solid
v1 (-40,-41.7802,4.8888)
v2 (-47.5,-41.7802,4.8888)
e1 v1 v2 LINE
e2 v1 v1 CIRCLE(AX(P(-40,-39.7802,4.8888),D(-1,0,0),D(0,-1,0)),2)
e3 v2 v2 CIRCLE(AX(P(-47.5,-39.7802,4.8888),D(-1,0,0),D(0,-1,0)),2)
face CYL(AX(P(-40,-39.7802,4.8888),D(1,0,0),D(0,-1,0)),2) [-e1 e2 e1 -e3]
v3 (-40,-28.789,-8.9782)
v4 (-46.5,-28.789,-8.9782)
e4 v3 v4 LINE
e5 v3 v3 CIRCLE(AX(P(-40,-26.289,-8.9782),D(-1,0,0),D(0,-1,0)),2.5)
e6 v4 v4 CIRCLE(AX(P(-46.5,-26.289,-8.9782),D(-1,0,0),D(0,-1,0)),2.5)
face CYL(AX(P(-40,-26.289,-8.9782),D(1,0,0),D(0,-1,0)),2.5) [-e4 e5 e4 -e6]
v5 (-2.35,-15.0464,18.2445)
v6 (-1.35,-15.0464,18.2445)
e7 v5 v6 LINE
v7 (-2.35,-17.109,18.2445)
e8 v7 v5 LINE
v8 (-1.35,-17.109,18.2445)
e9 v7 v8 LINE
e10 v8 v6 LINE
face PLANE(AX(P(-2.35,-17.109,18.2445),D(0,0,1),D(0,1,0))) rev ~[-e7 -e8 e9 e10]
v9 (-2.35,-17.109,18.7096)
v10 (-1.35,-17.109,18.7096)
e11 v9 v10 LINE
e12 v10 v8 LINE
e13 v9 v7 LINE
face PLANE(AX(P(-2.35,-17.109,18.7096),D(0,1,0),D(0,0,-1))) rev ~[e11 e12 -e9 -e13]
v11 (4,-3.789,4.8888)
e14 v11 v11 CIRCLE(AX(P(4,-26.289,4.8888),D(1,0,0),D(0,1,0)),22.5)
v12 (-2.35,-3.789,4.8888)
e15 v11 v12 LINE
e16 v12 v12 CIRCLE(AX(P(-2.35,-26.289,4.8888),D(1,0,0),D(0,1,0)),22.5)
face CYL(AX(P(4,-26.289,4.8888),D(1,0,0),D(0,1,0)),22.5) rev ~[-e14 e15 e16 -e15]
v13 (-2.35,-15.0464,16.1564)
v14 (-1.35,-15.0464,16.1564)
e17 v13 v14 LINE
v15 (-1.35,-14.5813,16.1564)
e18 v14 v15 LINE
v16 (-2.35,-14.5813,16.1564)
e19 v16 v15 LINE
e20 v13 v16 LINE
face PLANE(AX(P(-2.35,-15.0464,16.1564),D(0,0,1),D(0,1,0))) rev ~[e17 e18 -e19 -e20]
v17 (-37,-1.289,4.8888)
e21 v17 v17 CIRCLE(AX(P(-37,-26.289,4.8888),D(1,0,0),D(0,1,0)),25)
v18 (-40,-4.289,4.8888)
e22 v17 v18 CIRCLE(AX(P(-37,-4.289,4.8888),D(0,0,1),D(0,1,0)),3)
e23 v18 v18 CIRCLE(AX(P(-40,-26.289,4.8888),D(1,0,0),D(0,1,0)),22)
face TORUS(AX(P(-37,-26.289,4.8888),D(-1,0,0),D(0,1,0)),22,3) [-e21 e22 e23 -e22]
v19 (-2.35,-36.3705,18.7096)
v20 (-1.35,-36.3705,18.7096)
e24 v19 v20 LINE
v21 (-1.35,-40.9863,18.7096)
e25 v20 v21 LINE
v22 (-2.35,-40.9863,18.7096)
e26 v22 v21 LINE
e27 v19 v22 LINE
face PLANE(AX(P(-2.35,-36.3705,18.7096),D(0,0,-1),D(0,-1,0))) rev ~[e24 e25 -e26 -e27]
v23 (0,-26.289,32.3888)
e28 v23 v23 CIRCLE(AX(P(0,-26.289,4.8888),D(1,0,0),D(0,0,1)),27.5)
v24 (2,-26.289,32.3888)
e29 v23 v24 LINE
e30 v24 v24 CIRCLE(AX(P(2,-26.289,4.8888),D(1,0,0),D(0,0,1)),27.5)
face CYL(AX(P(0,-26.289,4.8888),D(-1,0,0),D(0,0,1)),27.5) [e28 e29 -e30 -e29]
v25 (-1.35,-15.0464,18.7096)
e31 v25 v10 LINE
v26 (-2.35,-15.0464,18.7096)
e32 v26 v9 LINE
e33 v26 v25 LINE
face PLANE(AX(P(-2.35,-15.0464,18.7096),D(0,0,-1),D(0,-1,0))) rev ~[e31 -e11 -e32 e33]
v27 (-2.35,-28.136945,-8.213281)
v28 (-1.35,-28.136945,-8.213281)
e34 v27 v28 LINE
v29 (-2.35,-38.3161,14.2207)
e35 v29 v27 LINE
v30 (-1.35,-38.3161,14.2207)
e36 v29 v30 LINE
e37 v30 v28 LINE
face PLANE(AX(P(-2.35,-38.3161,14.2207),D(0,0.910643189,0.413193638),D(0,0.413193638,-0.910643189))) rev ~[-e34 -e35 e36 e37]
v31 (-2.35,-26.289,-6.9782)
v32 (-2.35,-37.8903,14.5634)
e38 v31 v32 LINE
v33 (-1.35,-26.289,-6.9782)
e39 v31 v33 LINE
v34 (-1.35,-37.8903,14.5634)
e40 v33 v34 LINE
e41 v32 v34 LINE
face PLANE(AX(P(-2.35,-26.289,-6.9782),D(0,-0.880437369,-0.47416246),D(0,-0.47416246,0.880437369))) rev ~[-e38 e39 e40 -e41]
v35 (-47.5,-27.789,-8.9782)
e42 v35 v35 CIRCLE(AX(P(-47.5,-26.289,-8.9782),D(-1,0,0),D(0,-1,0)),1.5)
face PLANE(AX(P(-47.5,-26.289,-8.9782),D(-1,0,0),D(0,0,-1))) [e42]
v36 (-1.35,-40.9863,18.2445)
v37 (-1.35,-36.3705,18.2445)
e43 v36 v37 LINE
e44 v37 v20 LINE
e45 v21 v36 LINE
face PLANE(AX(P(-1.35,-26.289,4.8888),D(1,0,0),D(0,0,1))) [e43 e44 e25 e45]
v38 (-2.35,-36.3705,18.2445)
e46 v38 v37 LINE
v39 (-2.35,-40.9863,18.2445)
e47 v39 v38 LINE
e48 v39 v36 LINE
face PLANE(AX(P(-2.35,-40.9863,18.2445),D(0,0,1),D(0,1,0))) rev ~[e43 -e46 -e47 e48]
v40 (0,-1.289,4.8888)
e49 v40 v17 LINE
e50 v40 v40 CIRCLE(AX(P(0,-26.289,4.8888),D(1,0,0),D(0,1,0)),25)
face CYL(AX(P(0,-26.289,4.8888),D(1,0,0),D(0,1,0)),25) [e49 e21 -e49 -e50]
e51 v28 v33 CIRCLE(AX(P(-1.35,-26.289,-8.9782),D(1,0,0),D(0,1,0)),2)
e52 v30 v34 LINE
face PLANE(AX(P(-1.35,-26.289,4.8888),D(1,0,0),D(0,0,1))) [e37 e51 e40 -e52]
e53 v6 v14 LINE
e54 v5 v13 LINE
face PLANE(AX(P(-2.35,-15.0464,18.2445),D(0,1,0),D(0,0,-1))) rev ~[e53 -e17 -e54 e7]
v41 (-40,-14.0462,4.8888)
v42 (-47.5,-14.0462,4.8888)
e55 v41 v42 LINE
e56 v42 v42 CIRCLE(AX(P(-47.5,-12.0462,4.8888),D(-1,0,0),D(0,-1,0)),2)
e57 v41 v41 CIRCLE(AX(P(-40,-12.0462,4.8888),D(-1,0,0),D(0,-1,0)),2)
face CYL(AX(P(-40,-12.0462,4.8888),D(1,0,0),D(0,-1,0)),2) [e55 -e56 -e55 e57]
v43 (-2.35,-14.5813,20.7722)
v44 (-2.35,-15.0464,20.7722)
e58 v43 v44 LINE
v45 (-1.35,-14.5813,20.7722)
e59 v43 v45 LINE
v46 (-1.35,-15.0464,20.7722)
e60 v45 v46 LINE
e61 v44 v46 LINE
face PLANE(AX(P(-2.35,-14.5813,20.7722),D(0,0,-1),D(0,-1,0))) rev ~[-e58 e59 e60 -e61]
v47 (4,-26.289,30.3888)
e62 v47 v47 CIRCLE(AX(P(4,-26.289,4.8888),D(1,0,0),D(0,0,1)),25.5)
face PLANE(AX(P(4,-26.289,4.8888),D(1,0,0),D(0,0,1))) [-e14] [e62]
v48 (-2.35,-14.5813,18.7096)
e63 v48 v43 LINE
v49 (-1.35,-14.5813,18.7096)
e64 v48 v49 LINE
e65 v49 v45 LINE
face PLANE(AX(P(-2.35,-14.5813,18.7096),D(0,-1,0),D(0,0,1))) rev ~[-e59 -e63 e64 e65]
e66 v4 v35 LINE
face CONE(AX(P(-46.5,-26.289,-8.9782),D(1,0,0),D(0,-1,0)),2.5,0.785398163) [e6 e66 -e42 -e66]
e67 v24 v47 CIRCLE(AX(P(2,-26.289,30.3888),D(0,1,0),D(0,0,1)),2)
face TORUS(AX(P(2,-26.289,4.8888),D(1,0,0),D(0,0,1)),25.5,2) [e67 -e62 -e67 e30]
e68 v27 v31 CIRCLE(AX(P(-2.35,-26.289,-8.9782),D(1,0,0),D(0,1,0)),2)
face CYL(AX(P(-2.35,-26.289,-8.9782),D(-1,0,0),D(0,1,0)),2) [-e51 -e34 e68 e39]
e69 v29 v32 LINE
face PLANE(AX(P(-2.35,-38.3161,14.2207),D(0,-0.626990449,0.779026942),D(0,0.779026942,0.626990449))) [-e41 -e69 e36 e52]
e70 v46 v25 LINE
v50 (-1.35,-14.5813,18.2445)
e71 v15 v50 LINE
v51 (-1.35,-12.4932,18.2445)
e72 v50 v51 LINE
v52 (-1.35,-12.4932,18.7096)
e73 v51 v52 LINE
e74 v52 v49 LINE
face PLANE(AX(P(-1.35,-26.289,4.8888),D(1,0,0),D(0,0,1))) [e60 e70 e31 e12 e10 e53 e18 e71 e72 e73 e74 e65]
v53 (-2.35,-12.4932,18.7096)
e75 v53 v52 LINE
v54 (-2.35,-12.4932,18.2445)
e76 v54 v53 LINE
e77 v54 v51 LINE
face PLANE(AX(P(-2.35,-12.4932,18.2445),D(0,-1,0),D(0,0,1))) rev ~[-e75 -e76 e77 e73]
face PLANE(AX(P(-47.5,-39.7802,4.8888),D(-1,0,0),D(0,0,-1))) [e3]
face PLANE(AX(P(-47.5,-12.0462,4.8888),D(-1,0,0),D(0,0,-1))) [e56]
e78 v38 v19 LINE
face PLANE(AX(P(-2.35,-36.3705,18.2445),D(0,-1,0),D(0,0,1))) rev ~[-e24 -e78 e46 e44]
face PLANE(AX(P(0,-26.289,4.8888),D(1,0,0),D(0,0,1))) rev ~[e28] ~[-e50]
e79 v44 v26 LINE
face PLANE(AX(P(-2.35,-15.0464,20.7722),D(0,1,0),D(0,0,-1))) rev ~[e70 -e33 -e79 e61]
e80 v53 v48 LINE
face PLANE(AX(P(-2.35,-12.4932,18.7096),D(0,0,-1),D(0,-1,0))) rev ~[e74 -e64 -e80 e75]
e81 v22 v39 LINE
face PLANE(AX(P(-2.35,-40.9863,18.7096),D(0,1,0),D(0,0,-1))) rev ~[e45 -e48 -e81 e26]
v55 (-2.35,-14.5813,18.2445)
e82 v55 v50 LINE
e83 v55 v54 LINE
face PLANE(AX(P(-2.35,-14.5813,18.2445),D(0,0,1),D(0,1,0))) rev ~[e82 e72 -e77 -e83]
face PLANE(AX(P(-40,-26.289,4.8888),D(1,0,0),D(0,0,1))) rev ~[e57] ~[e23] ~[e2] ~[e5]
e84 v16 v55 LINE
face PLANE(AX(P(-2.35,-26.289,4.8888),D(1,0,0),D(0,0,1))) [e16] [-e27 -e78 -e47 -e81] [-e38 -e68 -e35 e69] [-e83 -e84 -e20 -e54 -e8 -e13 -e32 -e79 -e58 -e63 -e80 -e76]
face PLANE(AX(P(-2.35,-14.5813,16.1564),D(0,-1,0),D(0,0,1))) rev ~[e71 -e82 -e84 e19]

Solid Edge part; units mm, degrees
sketch "Sketch1" plane through (0, 0, 0) normal (1, 0, 0) x (0, 1, 0)
  circle A0 centre (-26.289, 4.8888) radius 25
  dimension "D1" = 50
extrude "Protrusion1" add sketch "Sketch1" against normal blind 40
sketch "Sketch2" plane through (0, -26.289, 4.8888) normal (1, 0, 0) x (0, 0, 1)
  circle A0 centre (0, 0) radius 27.5
extrude "ExtrudedProtrusion_2" add sketch "Sketch2" along normal blind 4
fillet "Round_1" radius 2 1 edges at (4, -26.289, -22.6112)
fillet "Round_2" radius 3 1 edges at (-40, -51.289, 4.8888)
sketch "Sketch3" plane through (-40, -26.289, 4.8888) normal (-1, 0, 0) x (0, -1, 0)
  circle A0 centre (-14.2428, 0) radius 2
  circle A1 centre (13.4912, 0) radius 2
  circle A2 centre (0, -13.867) radius 2.5
  dimension "D1" = 5
  dimension "D2" = 4
extrude "ExtrudedProtrusion_3" add sketch "Sketch3" along normal blind 7.5
chamfer "Chamfer_1" distance 1 angle 45 1 edges at (-47.5, -23.789, -8.9782)
sketch "Sketch4" plane through (4, -26.289, 4.8888) normal (1, 0, 0) x (0, 1, 0)
  circle A0 centre (0, 0) radius 22.5
extrude "ExtrudedCutout_1" cut sketch "Sketch4" against normal blind 6.35
sketch "Sketch5" plane through (-2.35, -26.289, 4.8888) normal (1, 0, 0) x (0, 1, 0)
  line L0 (0, -11.867) -> (-11.6013, 9.6746)
  line L1 (-12.0271, 9.3319) -> (-11.6013, 9.6746)
  line L2 (-12.0271, 9.3319) -> (-1.8479, -13.1021)
  arc A0 (-1.8479, -13.1021) -> (0, -11.867) centre (0, -13.867) ccw
  line L3 (-14.6973, 13.3557) -> (-10.0815, 13.3557)
  line L4 (-10.0815, 13.3557) -> (-10.0815, 13.8208)
  line L5 (-10.0815, 13.8208) -> (-14.6973, 13.8208)
  line L6 (-14.6973, 13.8208) -> (-14.6973, 13.3557)
  line L7 (11.7077, 13.3557) -> (13.7958, 13.3557)
  line L8 (13.7958, 13.3557) -> (13.7958, 13.8208)
  line L9 (13.7958, 13.8208) -> (11.7077, 13.8208)
  line L10 (11.7077, 13.8208) -> (11.7077, 15.8834)
  line L11 (11.7077, 15.8834) -> (11.2426, 15.8834)
  line L12 (11.2426, 15.8834) -> (11.2426, 13.8208)
  line L13 (11.2426, 13.8208) -> (9.18, 13.8208)
  line L14 (9.18, 13.8208) -> (9.18, 13.3557)
  line L15 (9.18, 13.3557) -> (11.2426, 13.3557)
  line L16 (11.2426, 13.3557) -> (11.2426, 11.2676)
  line L17 (11.2426, 11.2676) -> (11.7077, 11.2676)
  line L18 (11.7077, 11.2676) -> (11.7077, 13.3557)
  line L19 (9.18, 13.3557) -> (13.7958, 13.3557)
  line L20 (13.7958, 13.3557) -> (13.7958, 13.8208)
  line L21 (13.7958, 13.8208) -> (9.18, 13.8208)
  line L22 (9.18, 13.8208) -> (9.18, 13.3557)
  line L23 (11.7077, 11.2676) -> (11.7077, 15.8834)
  line L24 (11.7077, 15.8834) -> (11.2426, 15.8834)
  line L25 (11.2426, 15.8834) -> (11.2426, 11.2676)
  line L26 (11.2426, 11.2676) -> (11.7077, 11.2676)
extrude "ExtrudedProtrusion_4" add sketch "Sketch5" along normal blind 1
